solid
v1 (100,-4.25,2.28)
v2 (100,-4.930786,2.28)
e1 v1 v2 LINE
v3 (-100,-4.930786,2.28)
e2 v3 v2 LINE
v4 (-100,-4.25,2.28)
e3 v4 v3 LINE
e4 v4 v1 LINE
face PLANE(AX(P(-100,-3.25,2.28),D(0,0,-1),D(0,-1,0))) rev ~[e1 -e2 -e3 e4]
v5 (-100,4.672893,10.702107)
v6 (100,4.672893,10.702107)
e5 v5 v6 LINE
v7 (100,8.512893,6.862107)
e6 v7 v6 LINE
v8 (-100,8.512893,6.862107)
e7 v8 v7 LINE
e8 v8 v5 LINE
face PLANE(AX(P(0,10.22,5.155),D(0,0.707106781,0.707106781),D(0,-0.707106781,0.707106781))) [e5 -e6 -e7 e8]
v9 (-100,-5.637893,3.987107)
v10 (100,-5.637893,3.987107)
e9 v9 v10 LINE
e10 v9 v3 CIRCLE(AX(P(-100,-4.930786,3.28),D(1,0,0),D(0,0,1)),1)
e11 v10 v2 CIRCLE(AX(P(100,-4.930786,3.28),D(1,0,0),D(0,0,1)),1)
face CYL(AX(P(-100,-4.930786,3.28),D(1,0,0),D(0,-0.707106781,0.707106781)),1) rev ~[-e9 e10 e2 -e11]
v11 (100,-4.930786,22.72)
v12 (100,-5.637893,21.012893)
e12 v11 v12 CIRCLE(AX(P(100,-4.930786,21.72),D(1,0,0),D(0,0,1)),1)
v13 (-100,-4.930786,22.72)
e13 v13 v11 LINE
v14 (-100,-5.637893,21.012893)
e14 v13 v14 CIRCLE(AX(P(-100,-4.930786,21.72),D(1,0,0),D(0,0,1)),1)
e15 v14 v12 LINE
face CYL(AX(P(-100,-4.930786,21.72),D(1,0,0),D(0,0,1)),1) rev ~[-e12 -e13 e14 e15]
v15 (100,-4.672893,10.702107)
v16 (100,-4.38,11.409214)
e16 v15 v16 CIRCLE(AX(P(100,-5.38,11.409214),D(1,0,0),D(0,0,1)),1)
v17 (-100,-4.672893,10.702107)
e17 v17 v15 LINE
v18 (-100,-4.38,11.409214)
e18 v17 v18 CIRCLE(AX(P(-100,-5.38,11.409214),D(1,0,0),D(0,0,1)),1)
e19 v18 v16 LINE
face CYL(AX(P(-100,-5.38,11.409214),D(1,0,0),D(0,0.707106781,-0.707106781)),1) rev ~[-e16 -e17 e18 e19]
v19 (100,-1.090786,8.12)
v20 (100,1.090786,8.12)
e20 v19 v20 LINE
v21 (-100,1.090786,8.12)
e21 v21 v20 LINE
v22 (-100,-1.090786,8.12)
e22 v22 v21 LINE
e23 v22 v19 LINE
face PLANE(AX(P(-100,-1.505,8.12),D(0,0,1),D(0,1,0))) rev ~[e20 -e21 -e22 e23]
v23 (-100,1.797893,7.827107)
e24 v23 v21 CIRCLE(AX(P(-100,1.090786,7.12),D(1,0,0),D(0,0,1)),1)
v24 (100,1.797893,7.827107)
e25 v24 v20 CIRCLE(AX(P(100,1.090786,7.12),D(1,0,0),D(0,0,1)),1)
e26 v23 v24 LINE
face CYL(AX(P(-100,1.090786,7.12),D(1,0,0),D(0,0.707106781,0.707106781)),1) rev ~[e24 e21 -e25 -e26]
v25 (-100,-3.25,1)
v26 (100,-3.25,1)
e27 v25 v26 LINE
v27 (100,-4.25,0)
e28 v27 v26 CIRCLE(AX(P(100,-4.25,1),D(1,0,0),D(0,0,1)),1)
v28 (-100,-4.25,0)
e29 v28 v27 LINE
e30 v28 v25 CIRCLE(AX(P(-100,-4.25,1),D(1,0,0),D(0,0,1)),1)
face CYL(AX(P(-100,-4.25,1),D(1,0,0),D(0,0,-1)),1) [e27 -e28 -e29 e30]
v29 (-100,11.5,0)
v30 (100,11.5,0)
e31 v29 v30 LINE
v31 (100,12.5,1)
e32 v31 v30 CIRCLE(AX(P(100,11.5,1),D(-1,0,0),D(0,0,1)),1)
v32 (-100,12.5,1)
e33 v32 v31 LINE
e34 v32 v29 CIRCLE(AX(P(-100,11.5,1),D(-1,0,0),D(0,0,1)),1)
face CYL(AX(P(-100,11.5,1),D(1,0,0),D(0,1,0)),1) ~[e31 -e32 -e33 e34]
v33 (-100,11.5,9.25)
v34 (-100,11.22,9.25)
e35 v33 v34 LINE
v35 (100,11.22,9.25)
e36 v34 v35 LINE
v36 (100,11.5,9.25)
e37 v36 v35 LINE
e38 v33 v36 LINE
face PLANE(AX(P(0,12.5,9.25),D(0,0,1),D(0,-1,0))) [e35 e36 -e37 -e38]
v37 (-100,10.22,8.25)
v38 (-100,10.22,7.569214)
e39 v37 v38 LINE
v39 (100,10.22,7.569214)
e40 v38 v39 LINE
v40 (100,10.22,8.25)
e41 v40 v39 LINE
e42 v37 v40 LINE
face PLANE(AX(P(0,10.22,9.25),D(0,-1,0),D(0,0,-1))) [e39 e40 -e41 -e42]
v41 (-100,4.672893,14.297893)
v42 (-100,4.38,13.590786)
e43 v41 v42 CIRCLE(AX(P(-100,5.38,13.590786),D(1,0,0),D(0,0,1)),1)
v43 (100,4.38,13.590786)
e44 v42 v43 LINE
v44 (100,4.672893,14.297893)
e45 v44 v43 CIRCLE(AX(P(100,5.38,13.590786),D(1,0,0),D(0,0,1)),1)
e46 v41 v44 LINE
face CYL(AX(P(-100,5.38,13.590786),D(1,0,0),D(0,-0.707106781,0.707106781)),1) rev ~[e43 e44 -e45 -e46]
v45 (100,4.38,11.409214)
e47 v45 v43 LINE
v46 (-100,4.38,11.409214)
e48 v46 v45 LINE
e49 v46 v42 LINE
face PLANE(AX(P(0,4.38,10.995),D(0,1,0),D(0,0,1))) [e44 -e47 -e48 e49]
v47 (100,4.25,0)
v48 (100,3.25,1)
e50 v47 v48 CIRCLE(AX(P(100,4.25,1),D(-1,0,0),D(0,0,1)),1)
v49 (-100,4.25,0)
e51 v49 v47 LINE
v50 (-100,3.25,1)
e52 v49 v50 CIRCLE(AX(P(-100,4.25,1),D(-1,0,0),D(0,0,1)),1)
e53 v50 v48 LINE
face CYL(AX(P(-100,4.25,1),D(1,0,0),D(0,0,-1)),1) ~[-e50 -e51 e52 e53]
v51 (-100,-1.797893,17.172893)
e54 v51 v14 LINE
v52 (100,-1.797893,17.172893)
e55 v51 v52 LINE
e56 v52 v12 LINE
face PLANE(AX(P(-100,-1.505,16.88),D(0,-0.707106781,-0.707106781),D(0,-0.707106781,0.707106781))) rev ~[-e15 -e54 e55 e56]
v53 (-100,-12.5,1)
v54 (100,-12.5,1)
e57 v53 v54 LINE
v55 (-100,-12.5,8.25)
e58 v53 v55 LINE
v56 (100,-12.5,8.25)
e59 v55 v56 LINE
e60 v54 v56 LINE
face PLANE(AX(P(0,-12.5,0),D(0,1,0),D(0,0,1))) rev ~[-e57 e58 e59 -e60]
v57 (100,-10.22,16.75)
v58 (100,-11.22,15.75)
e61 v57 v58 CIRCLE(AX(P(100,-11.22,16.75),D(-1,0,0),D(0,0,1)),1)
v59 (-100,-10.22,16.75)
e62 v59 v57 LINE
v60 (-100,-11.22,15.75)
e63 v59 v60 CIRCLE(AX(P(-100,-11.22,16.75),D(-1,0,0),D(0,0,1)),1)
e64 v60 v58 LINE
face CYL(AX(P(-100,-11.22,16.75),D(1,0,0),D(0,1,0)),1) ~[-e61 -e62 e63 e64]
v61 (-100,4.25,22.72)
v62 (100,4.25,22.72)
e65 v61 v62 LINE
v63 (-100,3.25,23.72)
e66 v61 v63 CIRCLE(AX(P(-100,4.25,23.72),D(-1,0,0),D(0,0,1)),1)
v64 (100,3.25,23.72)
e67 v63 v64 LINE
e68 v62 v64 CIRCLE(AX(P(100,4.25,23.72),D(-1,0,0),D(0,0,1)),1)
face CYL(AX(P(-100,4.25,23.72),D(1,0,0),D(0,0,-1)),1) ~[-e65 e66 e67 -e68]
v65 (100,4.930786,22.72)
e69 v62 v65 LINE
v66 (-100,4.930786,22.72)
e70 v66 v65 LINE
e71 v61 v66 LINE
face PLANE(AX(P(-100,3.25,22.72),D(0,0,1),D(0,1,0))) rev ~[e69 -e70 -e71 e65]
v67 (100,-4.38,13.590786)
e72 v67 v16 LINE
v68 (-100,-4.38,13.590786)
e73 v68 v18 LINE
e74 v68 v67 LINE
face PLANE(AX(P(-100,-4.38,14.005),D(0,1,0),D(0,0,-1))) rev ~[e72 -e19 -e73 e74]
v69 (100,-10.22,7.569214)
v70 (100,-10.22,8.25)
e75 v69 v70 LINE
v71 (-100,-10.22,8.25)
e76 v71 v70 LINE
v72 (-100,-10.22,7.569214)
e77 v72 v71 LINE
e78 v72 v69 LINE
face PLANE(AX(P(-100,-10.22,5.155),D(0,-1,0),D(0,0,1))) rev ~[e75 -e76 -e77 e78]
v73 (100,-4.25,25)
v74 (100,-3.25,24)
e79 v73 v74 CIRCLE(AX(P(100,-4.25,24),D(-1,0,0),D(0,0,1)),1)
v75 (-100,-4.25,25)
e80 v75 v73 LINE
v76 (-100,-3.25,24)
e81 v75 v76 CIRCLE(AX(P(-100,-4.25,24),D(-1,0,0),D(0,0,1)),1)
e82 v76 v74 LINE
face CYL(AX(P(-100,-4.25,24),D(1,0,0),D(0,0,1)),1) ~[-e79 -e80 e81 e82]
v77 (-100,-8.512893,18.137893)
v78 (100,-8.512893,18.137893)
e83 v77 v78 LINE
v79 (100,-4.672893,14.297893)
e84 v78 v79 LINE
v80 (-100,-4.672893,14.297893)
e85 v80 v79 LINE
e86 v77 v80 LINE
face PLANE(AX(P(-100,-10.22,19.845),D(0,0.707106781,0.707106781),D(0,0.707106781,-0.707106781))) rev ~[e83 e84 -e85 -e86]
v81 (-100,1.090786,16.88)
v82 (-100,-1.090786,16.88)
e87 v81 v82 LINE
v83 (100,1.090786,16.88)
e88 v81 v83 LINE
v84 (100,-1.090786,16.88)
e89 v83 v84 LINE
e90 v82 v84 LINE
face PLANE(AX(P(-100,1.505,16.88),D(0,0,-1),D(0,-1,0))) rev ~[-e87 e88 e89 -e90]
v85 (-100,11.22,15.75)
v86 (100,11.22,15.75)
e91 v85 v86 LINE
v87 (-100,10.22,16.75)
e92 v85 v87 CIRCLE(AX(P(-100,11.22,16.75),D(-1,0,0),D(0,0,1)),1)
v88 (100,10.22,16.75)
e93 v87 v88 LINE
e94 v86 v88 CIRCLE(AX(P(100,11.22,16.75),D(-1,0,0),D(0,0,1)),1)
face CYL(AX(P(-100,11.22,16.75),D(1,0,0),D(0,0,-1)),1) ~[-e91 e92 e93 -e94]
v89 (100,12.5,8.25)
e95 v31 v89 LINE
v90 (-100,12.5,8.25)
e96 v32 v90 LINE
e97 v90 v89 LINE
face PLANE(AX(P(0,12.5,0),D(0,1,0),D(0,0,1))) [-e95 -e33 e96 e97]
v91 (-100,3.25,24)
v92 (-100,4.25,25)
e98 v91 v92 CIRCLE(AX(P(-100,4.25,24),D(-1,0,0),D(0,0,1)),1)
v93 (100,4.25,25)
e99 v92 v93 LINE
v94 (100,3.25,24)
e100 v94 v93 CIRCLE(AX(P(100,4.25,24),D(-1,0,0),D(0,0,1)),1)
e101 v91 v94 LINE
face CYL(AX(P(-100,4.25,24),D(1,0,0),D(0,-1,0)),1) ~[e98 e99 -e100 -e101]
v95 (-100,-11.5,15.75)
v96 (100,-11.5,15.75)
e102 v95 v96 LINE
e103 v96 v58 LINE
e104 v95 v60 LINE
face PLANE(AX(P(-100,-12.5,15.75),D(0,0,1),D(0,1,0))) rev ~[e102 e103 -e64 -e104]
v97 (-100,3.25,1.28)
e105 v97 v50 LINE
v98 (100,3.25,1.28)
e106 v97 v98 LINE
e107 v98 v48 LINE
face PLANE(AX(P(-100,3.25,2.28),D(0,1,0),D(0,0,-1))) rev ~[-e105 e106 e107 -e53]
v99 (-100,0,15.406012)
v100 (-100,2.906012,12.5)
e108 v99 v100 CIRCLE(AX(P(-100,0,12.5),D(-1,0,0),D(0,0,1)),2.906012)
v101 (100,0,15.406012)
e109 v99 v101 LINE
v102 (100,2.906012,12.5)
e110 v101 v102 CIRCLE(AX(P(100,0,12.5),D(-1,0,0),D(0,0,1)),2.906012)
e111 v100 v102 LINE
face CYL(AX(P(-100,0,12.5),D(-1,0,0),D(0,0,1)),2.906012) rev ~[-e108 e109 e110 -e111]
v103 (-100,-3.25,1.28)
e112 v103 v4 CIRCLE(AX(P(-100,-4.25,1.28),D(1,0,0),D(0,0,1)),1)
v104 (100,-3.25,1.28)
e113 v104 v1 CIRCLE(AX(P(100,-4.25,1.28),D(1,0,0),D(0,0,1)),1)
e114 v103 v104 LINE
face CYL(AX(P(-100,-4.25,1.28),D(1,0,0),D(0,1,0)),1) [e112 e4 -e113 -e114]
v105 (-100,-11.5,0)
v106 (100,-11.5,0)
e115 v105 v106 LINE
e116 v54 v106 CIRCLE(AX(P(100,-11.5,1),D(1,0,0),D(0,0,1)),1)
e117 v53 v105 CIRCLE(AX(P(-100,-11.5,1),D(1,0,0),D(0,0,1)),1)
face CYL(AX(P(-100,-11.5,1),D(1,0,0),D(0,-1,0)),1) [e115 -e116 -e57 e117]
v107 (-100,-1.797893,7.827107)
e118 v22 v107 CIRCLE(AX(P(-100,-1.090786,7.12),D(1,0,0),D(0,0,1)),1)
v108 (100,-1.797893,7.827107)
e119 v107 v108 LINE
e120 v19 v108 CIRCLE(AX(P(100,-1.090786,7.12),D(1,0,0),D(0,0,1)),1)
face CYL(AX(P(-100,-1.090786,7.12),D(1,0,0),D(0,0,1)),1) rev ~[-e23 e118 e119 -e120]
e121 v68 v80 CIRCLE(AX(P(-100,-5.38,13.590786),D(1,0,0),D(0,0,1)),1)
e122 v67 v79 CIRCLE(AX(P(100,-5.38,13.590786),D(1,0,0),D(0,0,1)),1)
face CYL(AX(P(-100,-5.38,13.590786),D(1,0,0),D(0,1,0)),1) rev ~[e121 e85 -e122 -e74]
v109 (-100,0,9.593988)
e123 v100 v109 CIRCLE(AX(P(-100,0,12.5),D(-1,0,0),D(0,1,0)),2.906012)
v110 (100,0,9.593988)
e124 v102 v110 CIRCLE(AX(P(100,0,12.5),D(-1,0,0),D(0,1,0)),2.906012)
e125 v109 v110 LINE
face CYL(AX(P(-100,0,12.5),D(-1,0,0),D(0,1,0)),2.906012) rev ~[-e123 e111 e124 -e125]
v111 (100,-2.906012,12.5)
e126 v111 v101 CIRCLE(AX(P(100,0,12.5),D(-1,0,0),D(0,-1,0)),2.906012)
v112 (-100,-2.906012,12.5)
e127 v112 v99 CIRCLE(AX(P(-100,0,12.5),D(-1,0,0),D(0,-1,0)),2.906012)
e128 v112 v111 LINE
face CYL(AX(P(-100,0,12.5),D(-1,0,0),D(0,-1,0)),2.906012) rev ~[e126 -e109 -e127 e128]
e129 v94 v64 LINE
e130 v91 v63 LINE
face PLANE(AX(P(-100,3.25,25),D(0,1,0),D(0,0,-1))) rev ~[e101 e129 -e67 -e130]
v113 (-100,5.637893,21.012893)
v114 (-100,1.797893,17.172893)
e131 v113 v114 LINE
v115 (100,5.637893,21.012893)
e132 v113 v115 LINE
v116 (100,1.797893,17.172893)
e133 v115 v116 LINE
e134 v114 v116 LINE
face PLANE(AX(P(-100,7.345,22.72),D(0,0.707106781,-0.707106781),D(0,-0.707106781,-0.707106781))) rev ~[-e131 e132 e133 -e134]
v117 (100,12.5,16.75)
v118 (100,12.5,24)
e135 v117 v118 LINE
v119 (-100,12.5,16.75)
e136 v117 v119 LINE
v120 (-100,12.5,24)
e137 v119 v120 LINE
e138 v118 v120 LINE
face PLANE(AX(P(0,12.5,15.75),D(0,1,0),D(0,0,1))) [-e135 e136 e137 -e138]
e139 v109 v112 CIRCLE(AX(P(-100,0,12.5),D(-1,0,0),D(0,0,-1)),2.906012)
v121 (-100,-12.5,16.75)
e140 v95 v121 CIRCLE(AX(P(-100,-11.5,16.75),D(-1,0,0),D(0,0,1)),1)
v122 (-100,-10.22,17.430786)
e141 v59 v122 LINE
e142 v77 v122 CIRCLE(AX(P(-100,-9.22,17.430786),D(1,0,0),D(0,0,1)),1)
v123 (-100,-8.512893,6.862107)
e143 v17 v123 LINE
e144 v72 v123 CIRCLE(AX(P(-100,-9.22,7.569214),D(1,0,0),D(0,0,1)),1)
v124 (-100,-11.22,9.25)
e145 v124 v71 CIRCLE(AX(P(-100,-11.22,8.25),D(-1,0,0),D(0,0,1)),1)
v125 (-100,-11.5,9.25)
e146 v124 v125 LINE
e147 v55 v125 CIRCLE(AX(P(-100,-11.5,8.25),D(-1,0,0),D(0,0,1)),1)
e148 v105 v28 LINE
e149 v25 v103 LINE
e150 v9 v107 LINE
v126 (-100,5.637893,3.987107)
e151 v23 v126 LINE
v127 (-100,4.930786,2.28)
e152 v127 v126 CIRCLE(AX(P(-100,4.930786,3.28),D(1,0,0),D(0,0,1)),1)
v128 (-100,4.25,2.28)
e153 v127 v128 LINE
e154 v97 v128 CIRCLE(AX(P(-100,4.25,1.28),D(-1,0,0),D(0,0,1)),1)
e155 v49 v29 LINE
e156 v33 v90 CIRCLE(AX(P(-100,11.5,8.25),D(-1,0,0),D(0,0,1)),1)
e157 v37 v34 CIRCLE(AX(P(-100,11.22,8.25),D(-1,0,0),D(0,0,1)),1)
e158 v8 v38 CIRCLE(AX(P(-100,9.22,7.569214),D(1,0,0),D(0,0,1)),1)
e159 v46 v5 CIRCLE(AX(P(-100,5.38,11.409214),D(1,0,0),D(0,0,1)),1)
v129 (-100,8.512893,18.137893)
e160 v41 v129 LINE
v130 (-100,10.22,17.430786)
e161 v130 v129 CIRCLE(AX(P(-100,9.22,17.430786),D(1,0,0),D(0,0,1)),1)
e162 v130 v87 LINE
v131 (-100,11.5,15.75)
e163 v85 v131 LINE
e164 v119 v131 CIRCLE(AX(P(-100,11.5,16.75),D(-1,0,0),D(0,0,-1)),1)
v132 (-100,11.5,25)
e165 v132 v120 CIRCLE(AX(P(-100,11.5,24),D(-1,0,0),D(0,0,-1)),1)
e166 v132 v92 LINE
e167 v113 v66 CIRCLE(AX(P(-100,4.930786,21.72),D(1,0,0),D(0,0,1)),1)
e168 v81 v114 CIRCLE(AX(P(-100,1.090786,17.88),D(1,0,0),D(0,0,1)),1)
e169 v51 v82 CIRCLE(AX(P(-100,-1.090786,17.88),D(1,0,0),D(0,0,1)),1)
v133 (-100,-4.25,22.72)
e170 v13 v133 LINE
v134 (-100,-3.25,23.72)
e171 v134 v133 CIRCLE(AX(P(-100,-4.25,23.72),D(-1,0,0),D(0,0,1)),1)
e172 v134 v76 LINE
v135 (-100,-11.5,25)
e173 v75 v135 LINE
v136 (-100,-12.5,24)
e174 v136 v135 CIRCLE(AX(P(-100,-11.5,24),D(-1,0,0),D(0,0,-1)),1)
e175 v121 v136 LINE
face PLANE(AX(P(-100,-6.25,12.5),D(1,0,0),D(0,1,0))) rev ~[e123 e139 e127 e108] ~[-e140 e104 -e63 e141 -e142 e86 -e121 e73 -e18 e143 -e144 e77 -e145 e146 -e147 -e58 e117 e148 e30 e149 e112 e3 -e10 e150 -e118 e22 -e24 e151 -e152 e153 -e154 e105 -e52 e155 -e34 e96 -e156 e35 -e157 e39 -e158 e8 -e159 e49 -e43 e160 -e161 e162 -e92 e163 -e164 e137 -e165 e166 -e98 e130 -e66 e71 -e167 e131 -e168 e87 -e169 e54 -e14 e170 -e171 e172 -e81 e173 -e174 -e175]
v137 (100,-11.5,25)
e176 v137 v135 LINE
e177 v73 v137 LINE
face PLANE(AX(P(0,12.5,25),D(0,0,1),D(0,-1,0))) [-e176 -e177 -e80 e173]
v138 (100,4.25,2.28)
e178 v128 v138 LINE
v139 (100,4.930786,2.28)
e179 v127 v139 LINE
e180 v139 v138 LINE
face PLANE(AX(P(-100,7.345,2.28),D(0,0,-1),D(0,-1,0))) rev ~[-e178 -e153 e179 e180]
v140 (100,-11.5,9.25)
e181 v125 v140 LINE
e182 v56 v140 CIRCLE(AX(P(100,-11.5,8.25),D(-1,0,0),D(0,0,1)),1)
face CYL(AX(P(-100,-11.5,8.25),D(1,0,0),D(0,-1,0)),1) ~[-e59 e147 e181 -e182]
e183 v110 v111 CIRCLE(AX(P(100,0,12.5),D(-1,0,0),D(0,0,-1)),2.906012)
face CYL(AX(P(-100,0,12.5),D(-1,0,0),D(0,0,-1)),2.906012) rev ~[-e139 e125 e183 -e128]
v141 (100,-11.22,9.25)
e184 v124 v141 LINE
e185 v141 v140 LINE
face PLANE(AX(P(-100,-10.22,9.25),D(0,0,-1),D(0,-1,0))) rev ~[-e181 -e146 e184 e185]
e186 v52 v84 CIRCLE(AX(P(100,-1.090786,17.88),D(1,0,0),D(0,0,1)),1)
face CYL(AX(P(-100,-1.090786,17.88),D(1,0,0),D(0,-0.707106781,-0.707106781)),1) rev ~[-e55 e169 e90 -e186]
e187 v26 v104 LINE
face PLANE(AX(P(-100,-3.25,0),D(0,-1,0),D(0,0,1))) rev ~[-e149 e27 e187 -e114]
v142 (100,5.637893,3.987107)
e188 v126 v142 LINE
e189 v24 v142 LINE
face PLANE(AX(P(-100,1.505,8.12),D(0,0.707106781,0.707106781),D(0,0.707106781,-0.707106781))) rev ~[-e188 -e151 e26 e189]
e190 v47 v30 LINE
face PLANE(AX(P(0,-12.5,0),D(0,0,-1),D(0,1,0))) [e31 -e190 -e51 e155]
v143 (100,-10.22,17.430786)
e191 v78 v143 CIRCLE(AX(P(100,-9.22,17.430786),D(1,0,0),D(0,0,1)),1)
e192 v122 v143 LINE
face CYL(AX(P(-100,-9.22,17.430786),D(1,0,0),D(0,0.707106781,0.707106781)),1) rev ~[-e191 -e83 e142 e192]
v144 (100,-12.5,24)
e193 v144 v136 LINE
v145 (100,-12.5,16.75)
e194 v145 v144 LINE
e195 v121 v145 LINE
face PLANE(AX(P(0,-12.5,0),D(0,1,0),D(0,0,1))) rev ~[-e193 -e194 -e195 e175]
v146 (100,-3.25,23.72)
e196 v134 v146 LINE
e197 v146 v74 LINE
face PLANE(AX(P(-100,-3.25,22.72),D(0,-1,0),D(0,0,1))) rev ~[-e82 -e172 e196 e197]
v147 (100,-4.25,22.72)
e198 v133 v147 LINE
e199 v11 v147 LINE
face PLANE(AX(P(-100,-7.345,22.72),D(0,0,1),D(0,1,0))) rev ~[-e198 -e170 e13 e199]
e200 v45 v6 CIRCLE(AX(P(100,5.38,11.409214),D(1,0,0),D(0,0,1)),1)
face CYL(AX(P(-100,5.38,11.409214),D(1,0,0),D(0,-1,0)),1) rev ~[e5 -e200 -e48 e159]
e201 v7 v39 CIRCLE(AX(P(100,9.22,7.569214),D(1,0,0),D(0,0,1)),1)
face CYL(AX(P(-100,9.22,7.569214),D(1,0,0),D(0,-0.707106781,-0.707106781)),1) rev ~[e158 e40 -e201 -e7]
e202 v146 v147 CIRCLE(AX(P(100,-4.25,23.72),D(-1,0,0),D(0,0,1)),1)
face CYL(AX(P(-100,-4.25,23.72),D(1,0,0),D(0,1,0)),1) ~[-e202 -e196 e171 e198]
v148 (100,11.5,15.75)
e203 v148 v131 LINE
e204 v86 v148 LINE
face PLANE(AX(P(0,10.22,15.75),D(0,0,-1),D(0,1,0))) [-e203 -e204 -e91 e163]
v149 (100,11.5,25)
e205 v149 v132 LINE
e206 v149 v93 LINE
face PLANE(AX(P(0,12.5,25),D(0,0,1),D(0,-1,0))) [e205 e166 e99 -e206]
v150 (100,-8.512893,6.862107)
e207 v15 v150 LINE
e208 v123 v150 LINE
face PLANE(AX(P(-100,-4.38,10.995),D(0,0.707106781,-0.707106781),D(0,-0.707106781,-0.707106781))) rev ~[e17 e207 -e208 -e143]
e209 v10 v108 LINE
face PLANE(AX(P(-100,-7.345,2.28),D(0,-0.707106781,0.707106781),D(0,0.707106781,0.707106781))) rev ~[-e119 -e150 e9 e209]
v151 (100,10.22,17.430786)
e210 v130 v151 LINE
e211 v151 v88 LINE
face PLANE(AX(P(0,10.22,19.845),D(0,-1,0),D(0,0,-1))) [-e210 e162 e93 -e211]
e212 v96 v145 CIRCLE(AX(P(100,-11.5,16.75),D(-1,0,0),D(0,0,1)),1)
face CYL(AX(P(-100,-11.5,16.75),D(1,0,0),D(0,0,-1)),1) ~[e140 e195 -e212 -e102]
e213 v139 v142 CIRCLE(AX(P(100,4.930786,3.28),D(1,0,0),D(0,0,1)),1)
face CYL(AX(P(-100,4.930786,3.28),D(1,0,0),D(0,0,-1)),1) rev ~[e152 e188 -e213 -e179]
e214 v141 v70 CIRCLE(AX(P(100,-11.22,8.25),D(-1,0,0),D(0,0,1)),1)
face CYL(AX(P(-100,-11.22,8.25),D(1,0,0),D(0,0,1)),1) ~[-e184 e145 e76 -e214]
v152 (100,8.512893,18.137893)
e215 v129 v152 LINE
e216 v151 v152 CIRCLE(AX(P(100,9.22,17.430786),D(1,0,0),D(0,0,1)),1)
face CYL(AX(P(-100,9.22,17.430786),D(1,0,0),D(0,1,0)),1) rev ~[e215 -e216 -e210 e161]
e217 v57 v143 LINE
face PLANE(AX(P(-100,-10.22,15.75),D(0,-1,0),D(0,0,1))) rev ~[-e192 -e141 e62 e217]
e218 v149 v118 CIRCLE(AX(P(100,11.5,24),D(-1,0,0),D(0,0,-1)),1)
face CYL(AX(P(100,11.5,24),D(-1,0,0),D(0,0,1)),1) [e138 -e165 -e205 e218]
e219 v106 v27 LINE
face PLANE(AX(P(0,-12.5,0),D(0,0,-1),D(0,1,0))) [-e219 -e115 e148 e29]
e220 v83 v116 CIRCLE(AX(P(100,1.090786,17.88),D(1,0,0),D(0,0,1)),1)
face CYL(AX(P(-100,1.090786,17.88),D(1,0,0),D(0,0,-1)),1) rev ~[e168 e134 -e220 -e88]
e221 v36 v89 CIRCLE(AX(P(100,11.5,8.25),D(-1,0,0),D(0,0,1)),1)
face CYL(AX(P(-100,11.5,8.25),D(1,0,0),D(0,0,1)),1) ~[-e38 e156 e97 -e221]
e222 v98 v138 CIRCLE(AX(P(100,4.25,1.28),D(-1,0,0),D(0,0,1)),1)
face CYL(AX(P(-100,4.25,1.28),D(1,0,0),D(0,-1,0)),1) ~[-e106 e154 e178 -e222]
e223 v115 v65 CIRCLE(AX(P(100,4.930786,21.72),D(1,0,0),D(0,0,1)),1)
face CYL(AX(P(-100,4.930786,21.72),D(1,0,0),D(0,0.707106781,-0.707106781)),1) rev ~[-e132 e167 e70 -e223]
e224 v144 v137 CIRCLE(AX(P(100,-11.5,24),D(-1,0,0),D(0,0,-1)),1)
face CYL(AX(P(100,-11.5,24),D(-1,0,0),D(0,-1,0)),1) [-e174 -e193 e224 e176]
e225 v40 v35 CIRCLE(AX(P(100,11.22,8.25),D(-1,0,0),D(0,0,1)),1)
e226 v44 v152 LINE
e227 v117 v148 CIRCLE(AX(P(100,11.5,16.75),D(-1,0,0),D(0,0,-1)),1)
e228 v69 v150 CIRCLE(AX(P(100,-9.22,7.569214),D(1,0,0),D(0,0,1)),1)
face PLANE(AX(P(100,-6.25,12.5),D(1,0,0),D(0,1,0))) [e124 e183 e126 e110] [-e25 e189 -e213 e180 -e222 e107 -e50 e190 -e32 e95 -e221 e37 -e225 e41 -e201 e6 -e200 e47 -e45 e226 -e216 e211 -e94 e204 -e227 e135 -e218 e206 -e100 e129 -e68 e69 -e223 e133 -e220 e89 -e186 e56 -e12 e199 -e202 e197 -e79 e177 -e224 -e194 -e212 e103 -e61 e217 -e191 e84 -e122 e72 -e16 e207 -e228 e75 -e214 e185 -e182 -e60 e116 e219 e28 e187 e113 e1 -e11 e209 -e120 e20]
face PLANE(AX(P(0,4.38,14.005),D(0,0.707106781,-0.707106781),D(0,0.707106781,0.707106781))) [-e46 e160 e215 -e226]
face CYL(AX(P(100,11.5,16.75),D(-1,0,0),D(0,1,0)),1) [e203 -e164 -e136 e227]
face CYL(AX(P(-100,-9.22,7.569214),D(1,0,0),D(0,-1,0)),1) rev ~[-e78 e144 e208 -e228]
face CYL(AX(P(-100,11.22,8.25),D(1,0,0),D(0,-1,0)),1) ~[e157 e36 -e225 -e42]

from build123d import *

# Parameters (mm, degrees)
F0_W             = 12.5
F0_H             = 25
F1_DEPTH         = 100
F2_W             = 2.28
F2_H             = 3.25
F3_DEPTH         = 200
F3_COPIES_COUNT  = 2
F3_COPIES_ANGLE  = 90
F3_COPIES1_COUNT = 2
F3_COPIES1_ANGLE = 270
F5_R             = 1
F7_R             = 2.5374832391
F8_DEPTH         = 200


# Not quite as in the source:
# - a pattern or mirror of a feature is missing from the dataset's text; its kind, count and spacing are read off the source's solid


with BuildPart() as f1:
    # F0 (on Right) → F1 (new body, symmetric)
    with BuildSketch(Plane.YZ):
        with Locations((-6.25, 12.5)):
            Rectangle(F0_W, F0_H)
        Polygon((0, 0), (12.5, 0), (12.5, 9.25), (10.22, 9.25), (10.22, 5.155), (4.38, 5.155), (4.38, 9.25), (4.38, 10.995), (4.38, 14.005), (4.38, 15.75), (4.38, 19.845), (10.22, 19.845), (10.22, 15.75), (12.5, 15.75), (12.5, 25), (0, 25), align=None)
        Polygon((10.22, 5.155), (6.125, 9.25), (4.38, 9.25), (4.38, 5.155), align=None)
        Polygon((4.38, 9.25), (6.125, 9.25), (4.38, 10.995), align=None)
        Polygon((4.38, 14.005), (6.125, 15.75), (4.38, 15.75), align=None)
        Polygon((4.38, 15.75), (6.125, 15.75), (10.22, 19.845), (4.38, 19.845), align=None)
    extrude(amount=F1_DEPTH, both=True)

    # F2 (on face) → F3 (cut, through all)
    with BuildSketch(Plane(origin=(-100, 0, 0), x_dir=(0, -1, 0), z_dir=(-1, 0, 0))):
        with Locations((11.36, 10.875)):
            Rectangle(F2_W, F2_H)
        with BuildLine():
            Line((0, 15.0374832391), (0, 9.9625167609))
            ThreePointArc((0, 9.9625167609), (1.7942716055, 10.7057283945), (2.5374832391, 12.5))
            ThreePointArc((2.5374832391, 12.5), (1.7942716055, 14.2942716055), (0, 15.0374832391))
        make_face()
        with Locations((11.36, 14.125)):
            Rectangle(F2_W, F2_H)
        Polygon((10.22, 5.155), (10.22, 9.25), (6.125, 9.25), align=None)
        Polygon((6.125, 9.25), (10.22, 9.25), (10.22, 12.5), (10.22, 15.75), (6.125, 15.75), (4.38, 14.005), (4.38, 10.995), align=None)
        Polygon((6.125, 15.75), (10.22, 15.75), (10.22, 19.845), align=None)
    f3 = extrude(amount=-F3_DEPTH, mode=Mode.SUBTRACT)

    # F3_copies: F3 ×2 about axis
    f3_copies_axis = Axis((0, 0, 12.5), (1, 0, 0))
    for i in range(1, F3_COPIES_COUNT):
        add(f3.rotate(f3_copies_axis, i * F3_COPIES_ANGLE / (F3_COPIES_COUNT - 1)), mode=Mode.SUBTRACT)

    # F3_copies1: F3 ×2 about axis
    f3_copies1_axis = Axis((0, 0, 12.5), (1, 0, 0))
    for i in range(1, F3_COPIES1_COUNT):
        add(f3.rotate(f3_copies1_axis, i * F3_COPIES1_ANGLE / (F3_COPIES1_COUNT - 1)), mode=Mode.SUBTRACT)

    # F5
    f5_edges = [f1.edges().sort_by_distance(p)[0] for p in [
        (0, -4.38, 14.005),
        (0, -4.38, 10.995),
        (0, -10.22, 19.845),
        (0, -10.22, 15.75),
        (0, -12.5, 15.75),
        (0, -12.5, 9.25),
        (0, -10.22, 9.25),
        (0, -10.22, 5.155),
        (0, 12.5, 25),
        (0, -12.5, 25),
        (0, -12.5, 0),
        (0, 12.5, 0),
        (0, 10.22, 19.845),
        (0, 10.22, 15.75),
        (0, 4.38, 14.005),
        (0, 4.38, 10.995),
        (0, 10.22, 5.155),
        (0, 10.22, 9.25),
        (0, 12.5, 9.25),
        (0, 3.25, 0),
        (0, 3.25, 2.28),
        (0, 7.345, 2.28),
        (0, 1.505, 8.12),
        (0, -1.505, 8.12),
        (0, -7.345, 2.28),
        (0, -3.25, 2.28),
        (0, -3.25, 0),
        (0, -3.25, 22.72),
        (0, -3.25, 25),
        (0, -7.345, 22.72),
        (0, -1.505, 16.88),
        (0, 1.505, 16.88),
        (0, 7.345, 22.72),
        (0, 3.25, 22.72),
        (0, 3.25, 25),
        (0, 12.5, 15.75),
    ]]
    fillet(f5_edges, radius=F5_R)

    # F7 (on face) → F8 (cut, through all)
    with BuildSketch(Plane(origin=(-100, 0, 0), x_dir=(0, -1, 0), z_dir=(-1, 0, 0))):
        with BuildLine():
            ThreePointArc((0, 9.5939878347), (2.0548609083, 10.4451390917), (2.9060121653, 12.5))
            ThreePointArc((2.9060121653, 12.5), (2.0548609083, 14.5548609083), (0, 15.4060121653))
            ThreePointArc((0, 15.4060121653), (-2.0548609083, 14.5548609083), (-2.9060121653, 12.5))
            ThreePointArc((-2.9060121653, 12.5), (-2.0548609083, 10.4451390917), (0, 9.5939878347))
        make_face()
        with Locations((0, 12.5)):
            Circle(F7_R, mode=Mode.SUBTRACT)
    extrude(amount=-F8_DEPTH, mode=Mode.SUBTRACT)


solid = f1.part
